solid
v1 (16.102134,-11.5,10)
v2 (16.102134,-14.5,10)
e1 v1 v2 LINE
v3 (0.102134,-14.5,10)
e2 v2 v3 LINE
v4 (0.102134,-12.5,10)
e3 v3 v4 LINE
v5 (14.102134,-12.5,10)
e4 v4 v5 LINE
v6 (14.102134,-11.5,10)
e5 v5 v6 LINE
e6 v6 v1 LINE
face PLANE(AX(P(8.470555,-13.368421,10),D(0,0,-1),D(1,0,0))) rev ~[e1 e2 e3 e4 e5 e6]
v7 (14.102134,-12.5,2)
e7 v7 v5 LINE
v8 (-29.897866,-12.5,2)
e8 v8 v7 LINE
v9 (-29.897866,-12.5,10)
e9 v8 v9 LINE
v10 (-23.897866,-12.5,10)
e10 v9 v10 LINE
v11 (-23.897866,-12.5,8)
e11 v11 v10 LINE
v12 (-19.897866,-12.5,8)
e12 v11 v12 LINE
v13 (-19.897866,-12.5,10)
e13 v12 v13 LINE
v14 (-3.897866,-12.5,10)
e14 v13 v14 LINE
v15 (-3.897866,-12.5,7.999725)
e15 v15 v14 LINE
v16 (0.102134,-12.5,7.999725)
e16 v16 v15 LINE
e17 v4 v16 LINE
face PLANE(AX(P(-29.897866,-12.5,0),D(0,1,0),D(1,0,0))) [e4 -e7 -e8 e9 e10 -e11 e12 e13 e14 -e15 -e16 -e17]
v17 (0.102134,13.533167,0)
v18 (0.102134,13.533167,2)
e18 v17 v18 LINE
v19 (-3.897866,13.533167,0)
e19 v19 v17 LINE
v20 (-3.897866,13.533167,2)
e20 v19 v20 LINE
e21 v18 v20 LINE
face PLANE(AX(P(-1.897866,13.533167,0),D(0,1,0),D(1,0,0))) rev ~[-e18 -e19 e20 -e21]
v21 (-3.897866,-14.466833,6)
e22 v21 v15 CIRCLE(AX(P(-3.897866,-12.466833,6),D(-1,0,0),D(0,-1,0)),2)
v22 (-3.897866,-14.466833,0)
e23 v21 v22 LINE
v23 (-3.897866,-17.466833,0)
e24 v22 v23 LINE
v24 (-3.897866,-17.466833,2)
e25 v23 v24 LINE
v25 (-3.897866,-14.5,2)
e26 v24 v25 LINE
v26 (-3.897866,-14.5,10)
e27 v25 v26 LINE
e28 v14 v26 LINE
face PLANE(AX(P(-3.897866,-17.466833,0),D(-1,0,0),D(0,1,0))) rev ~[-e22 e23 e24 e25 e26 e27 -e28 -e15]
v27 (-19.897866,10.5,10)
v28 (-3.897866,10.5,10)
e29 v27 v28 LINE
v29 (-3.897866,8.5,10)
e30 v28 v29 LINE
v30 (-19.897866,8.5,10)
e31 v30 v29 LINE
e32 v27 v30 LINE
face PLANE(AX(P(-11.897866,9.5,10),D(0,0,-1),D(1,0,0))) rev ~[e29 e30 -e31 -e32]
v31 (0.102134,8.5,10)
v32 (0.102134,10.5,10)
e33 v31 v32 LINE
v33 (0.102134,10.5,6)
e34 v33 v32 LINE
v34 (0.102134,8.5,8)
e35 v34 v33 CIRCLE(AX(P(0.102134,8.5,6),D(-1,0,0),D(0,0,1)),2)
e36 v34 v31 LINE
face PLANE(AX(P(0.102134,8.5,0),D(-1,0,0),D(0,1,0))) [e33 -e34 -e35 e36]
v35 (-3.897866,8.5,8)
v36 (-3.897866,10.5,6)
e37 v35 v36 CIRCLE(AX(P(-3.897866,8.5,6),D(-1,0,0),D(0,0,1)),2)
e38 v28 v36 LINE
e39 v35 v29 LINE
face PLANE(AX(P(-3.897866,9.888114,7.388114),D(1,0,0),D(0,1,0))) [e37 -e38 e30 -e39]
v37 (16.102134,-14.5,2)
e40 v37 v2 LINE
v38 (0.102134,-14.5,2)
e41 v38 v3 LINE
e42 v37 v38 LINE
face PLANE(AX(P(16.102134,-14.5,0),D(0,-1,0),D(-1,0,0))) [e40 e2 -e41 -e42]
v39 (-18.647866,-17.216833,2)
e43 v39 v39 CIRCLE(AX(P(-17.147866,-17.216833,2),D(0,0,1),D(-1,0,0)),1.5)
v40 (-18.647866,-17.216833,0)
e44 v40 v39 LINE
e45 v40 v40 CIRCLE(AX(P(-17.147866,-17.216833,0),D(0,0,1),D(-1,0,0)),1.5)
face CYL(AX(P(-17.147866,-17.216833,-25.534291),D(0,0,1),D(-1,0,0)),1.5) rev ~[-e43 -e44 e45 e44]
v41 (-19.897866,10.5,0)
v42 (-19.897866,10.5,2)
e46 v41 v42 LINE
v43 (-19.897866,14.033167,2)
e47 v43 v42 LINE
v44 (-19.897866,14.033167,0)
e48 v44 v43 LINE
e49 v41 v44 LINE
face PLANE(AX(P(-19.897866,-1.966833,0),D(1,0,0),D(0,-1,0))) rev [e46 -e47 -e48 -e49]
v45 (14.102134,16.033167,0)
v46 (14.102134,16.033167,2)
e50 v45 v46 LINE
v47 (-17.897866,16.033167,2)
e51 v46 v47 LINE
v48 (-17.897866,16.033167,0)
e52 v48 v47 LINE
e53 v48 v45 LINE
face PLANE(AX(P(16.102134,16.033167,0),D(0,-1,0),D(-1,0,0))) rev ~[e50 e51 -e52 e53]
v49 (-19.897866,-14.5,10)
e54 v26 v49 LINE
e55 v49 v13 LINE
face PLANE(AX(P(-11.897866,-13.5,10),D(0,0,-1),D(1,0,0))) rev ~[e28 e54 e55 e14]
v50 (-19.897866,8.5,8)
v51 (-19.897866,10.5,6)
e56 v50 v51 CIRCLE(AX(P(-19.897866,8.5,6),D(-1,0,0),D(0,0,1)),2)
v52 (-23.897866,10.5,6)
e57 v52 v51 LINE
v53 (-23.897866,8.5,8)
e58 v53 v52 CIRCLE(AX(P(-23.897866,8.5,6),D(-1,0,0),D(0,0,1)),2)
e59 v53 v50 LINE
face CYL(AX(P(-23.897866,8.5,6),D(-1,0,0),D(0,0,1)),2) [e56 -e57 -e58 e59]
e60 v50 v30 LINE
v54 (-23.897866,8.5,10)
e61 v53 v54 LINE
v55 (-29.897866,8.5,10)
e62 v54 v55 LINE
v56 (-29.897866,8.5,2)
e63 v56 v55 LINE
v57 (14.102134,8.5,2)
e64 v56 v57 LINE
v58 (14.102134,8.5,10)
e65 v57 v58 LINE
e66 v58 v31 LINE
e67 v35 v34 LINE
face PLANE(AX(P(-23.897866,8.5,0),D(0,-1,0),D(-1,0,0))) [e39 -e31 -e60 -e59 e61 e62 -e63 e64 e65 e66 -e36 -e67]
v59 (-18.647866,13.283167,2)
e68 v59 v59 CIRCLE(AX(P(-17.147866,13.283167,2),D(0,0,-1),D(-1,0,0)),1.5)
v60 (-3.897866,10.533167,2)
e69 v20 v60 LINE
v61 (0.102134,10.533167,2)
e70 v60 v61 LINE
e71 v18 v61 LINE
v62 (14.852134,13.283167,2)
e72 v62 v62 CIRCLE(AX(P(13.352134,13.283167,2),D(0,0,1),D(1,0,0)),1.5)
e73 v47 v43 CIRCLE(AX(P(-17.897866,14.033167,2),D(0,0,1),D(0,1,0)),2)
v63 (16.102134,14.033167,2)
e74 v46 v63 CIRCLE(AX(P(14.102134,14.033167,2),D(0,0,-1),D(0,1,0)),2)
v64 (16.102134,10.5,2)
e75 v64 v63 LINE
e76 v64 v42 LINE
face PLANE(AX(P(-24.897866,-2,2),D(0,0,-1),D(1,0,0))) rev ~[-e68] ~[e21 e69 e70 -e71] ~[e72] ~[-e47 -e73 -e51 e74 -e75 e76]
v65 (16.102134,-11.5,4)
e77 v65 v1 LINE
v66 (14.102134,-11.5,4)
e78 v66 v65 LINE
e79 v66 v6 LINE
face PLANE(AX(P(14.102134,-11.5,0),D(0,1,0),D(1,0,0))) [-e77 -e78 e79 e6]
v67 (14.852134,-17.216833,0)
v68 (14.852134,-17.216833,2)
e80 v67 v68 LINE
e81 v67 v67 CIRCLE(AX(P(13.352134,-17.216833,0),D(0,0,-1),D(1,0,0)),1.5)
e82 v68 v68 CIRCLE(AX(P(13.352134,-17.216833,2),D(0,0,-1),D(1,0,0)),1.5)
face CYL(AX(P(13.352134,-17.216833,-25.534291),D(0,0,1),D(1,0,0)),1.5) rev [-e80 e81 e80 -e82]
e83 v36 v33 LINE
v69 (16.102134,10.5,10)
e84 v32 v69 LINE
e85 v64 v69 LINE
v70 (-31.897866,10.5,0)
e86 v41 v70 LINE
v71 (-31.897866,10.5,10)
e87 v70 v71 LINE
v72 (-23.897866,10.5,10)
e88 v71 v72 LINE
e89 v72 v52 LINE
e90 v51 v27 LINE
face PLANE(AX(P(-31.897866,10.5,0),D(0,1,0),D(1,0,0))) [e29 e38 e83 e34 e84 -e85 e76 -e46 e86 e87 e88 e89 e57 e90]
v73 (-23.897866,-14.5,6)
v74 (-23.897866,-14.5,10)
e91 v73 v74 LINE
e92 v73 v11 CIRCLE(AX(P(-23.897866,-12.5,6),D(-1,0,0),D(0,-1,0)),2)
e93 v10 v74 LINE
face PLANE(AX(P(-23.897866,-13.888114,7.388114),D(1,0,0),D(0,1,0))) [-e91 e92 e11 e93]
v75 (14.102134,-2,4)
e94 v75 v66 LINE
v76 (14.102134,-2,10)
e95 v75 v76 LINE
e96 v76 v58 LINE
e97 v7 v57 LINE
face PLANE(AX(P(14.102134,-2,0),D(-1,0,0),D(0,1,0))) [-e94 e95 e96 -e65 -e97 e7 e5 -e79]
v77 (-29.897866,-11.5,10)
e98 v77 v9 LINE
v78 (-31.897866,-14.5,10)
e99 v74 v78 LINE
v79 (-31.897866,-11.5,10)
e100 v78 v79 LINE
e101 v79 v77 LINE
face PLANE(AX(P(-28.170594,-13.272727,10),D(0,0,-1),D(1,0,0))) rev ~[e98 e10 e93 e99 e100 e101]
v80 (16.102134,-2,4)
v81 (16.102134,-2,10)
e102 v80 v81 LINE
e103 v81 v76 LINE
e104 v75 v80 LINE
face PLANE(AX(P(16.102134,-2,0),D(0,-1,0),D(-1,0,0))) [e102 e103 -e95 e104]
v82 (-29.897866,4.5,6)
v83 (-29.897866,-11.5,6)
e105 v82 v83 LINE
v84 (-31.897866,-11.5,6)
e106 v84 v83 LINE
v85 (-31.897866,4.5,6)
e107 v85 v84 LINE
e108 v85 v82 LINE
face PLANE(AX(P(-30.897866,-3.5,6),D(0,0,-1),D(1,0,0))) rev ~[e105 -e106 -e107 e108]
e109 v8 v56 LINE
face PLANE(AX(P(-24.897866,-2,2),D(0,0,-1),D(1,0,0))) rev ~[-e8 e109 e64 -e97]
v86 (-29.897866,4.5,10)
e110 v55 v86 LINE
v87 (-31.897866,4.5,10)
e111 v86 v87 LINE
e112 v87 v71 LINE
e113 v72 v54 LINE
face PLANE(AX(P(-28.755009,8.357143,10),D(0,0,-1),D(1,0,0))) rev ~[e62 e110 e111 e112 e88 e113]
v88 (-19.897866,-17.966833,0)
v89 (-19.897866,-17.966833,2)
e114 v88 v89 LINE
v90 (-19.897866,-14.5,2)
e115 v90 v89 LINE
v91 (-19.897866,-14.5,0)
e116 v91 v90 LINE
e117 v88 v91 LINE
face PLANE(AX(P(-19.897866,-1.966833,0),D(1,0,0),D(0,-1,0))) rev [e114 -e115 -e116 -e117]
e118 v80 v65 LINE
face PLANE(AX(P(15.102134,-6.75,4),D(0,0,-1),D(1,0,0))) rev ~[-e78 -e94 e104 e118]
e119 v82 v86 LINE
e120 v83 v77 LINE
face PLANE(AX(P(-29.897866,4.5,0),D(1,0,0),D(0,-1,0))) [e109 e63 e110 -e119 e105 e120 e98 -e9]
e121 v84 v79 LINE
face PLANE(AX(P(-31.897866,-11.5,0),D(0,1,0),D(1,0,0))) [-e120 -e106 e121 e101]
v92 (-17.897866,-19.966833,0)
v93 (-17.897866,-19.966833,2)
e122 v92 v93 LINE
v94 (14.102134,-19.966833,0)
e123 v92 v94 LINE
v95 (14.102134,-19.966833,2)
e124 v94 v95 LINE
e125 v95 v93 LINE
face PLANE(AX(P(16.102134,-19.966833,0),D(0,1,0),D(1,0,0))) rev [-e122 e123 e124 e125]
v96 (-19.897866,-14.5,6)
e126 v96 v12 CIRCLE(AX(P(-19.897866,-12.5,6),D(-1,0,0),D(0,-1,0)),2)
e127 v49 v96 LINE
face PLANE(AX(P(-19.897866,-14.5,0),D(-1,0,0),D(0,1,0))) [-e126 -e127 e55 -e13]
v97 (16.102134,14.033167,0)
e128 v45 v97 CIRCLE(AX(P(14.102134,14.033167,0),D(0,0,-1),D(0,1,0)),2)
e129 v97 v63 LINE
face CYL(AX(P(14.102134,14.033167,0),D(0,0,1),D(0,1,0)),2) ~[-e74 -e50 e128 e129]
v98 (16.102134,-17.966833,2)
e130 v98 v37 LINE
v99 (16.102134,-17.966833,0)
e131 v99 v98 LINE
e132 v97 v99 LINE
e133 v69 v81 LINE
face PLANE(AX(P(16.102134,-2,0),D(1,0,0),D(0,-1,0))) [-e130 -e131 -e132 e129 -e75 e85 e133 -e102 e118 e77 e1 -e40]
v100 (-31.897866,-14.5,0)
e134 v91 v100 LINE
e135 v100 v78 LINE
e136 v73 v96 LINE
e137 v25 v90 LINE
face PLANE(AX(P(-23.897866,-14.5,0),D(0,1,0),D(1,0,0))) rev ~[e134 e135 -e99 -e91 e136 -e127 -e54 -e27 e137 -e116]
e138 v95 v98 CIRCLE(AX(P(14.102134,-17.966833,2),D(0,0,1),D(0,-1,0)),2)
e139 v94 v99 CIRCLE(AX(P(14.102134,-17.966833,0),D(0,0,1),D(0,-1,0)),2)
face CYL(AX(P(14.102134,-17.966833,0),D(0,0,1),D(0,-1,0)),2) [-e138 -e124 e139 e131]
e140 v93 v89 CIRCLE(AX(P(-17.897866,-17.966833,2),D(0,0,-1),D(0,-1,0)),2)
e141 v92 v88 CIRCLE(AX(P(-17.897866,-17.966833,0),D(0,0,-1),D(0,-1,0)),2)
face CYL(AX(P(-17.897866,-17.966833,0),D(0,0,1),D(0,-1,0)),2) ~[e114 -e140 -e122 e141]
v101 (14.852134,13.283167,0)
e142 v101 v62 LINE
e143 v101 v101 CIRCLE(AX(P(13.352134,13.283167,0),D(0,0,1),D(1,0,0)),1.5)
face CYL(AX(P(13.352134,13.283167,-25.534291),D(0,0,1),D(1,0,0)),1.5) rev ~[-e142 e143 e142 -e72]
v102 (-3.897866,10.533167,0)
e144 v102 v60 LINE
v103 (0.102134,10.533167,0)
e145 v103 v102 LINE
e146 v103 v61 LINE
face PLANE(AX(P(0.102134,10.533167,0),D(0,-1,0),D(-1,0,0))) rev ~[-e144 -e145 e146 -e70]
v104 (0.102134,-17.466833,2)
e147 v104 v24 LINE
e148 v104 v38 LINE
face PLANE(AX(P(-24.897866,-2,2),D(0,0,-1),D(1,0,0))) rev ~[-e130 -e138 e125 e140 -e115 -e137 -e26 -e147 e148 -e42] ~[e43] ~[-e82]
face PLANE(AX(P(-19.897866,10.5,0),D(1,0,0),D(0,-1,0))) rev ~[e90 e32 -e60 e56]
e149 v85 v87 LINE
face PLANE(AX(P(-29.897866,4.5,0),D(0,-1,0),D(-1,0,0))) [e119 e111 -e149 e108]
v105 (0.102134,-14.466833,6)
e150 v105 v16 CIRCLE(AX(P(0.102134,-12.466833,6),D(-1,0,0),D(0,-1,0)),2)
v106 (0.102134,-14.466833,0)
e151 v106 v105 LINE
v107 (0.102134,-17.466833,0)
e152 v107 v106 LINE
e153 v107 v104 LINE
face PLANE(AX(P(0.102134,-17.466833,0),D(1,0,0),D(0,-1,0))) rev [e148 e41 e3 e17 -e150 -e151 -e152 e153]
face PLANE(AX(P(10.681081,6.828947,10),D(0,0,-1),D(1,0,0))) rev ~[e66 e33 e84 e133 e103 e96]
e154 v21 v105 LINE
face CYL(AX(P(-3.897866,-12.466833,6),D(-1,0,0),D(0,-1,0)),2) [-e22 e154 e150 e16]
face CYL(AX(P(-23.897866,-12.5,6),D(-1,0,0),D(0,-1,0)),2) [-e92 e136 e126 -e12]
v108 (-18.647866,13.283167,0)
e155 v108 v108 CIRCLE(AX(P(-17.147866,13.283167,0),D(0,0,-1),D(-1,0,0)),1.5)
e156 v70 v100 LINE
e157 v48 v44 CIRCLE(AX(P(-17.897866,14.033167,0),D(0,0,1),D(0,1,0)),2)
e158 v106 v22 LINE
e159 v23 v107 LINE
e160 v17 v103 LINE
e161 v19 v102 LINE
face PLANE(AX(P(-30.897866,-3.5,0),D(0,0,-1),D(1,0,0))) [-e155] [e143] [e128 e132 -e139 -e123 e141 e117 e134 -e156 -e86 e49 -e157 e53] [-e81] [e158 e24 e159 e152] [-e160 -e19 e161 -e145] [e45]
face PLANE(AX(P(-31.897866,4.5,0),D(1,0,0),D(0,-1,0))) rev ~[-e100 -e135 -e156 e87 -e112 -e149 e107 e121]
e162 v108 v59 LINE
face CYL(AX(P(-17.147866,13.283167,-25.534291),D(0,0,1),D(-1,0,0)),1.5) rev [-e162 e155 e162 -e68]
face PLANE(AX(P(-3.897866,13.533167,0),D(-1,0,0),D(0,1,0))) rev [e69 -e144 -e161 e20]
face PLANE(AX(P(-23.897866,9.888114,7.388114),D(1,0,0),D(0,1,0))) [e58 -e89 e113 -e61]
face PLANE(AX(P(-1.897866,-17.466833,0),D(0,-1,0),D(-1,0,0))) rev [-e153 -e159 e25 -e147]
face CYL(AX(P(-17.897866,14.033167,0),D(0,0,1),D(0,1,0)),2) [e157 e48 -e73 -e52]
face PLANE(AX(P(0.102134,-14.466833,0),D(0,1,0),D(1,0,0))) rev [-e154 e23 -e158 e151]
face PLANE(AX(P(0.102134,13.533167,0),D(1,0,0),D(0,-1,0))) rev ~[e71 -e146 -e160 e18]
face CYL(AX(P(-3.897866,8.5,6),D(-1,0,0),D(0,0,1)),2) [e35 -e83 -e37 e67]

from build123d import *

# Parameters (mm, degrees)
F1_DEPTH     = 2
F2_R         = 2
F3_D         = 3
F6_W         = 2
F6_H         = 9.5
F7_DEPTH     = 2
F6_W_2       = 4
F6_H_2       = 2
F6_H_3       = 1.9668334348
F8_DEPTH     = 8
F6_W_3       = 16
F9_DEPTH     = 10
F10_T1_DEPTH = 4
F10_T3_DEPTH = 4
F11_DEPTH    = 4
F6_H_4       = 16
F12_DEPTH    = 6


# Not quite as in the source:
# - a fillet or chamfer that OpenCascade refuses, or shapes differently, is made with other operations: its cross-section is extruded or revolved along the edge and cut away or added
# - a feature names something its author has since deleted; it is built from what else it names


with BuildPart() as f1:
    # F0 (on Top) → F1 (new body)
    with BuildSketch(Plane.XY):
        Polygon((-19.8978664808, -19.9668334348), (-1.8978664808, -19.9668334348), (-1.8978664808, -17.4668334348), (-3.8978664808, -17.4668334348), (-3.8978664808, -14.4668334348), (-1.8978664808, -14.4668334348), (-1.8978664808, -1.9668334348), (-19.8978664808, -1.9668334348), align=None)
    extrude(amount=F1_DEPTH)

    # F2
    f2_edges = [f1.edges().sort_by_distance(p)[0] for p in [
        (-19.897866, -19.966833, 1),
    ]]
    fillet(f2_edges, radius=F2_R)

    # F3 (through all)
    with Locations(Plane(origin=(0, 0, 0), x_dir=(1, 0, 0), z_dir=(0, 0, -1))):
        with Locations((-17.1478664808, 17.2168334348)):
            Hole(F3_D / 2)

    # F4: F1 across face


with BuildPart() as f1_1:
    add(f1.part)
    add(f1.part.mirror(Plane(origin=(-1.8978664808, -8.2168334348, 1), x_dir=(0, 1, 0), z_dir=(1, 0, 0))))

    # F5: F1 across face


with BuildPart() as f1_2:
    add(f1_1.part)
    add(f1_1.part.mirror(Plane(origin=(-1.8978664808, -1.9668334348, 1), x_dir=(-1, 0, 0), z_dir=(0, 1, 0))))

    # F6 (on face) → F7 (join)
    with BuildSketch(Plane(origin=(0, 0, 0), x_dir=(1, 0, 0), z_dir=(0, 0, -1))):
        Polygon((-29.8978664808, -8.5), (-23.8978664808, -8.5), (-19.8978664808, -8.5), (-19.8978664808, 12.5), (-23.8978664808, 12.5), (-29.8978664808, 12.5), (-29.8978664808, 11.5), (-29.8978664808, -4.5), align=None)
        with Locations((15.1021335192, 6.75)):
            Rectangle(F6_W, F6_H)
        Polygon((-19.8978664808, 12.5), (-19.8978664808, -8.5), (-3.8978664808, -8.5), (0.1021335192, -8.5), (14.1021335192, -8.5), (14.1021335192, 2), (14.1021335192, 11.5), (14.1021335192, 12.5), (0.1021335192, 12.5), (-3.8978664808, 12.5), align=None)
    extrude(amount=-F7_DEPTH)

    # F6 (on face) → F8 (join)
    with BuildSketch(Plane(origin=(0, 0, 0), x_dir=(1, 0, 0), z_dir=(0, 0, -1))):
        with Locations((-1.8978664808, -9.5)):
            Rectangle(F6_W_2, F6_H_2)
        with Locations((-1.8978664808, 13.4834167174)):
            Rectangle(F6_W_2, F6_H_3)
        with Locations((-21.8978664808, 13.5)):
            Rectangle(F6_W_2, F6_H_2)
        with Locations((-21.8978664808, -9.5)):
            Rectangle(F6_W_2, F6_H_2)
    extrude(amount=-F8_DEPTH)

    # F6 (on face) → F9 (join)
    with BuildSketch(Plane(origin=(0, 0, 0), x_dir=(1, 0, 0), z_dir=(0, 0, -1))):
        Polygon((-31.8978664808, -10.5), (-23.8978664808, -10.5), (-23.8978664808, -8.5), (-29.8978664808, -8.5), (-29.8978664808, -4.5), (-31.8978664808, -4.5), align=None)
        Polygon((0.1021335192, -8.5), (0.1021335192, -10.5), (16.1021335192, -10.5), (16.1021335192, 2), (14.1021335192, 2), (14.1021335192, -8.5), align=None)
        Polygon((0.1021335192, 14.4668334348), (0.1021335192, 12.5), (14.1021335192, 12.5), (14.1021335192, 11.5), (16.1021335192, 11.5), (16.1021335192, 14.5), (0.1021335192, 14.5), align=None)
        Polygon((-19.8978664808, 14.5), (-19.8978664808, 12.5), (-3.8978664808, 12.5), (-3.8978664808, 14.4668334348), (-3.8978664808, 14.5), align=None)
        Polygon((-31.8978664808, 14.5), (-31.8978664808, 11.5), (-29.8978664808, 11.5), (-29.8978664808, 12.5), (-23.8978664808, 12.5), (-23.8978664808, 14.5), align=None)
        with Locations((-11.8978664808, -9.5)):
            Rectangle(F6_W_3, F6_H_2)
    extrude(amount=-F9_DEPTH)

    # F10: fillet of radius 2 on 4 edges, made by hand

    # F10_s2 → F10_t1 (cut)
    with BuildSketch(Plane.YZ.offset(-3.8978664808)):
        with BuildLine():
            ThreePointArc((-14.4668334348, 6), (-13.8810469972, 7.4142135624), (-12.4668334348, 8))
            Line((-12.4668334348, 8), (-14.4668334348, 8))
            Line((-14.4668334348, 8), (-14.4668334348, 6))
        make_face()
        with BuildLine():
            ThreePointArc((8.5, 8), (9.9142135624, 7.4142135624), (10.5, 6))
            Line((10.5, 6), (10.5, 8))
            Line((10.5, 8), (8.5, 8))
        make_face()
    extrude(amount=F10_T1_DEPTH, mode=Mode.SUBTRACT)

    # F10_s4 → F10_t3 (cut)
    with BuildSketch(Plane.YZ.offset(-23.8978664808)):
        with BuildLine():
            ThreePointArc((8.5, 8), (9.9142135624, 7.4142135624), (10.5, 6))
            Line((10.5, 6), (10.5, 8))
            Line((10.5, 8), (8.5, 8))
        make_face()
        with BuildLine():
            ThreePointArc((-14.5, 6), (-13.9142135624, 7.4142135624), (-12.5, 8))
            Line((-12.5, 8), (-14.5, 8))
            Line((-14.5, 8), (-14.5, 6))
        make_face()
    extrude(amount=F10_T3_DEPTH, mode=Mode.SUBTRACT)

    # F6 (on face) → F11 (join)
    with BuildSketch(Plane(origin=(0, 0, 0), x_dir=(1, 0, 0), z_dir=(0, 0, -1))):
        with Locations((15.1021335192, 6.75)):
            Rectangle(F6_W, F6_H)
    extrude(amount=-F11_DEPTH)

    # F6 (on face) → F12 (join)
    with BuildSketch(Plane(origin=(0, 0, 0), x_dir=(1, 0, 0), z_dir=(0, 0, -1))):
        with Locations((-30.8978664808, 3.5)):
            Rectangle(F6_W, F6_H_4)
    extrude(amount=-F12_DEPTH)


solid = f1_2.part
